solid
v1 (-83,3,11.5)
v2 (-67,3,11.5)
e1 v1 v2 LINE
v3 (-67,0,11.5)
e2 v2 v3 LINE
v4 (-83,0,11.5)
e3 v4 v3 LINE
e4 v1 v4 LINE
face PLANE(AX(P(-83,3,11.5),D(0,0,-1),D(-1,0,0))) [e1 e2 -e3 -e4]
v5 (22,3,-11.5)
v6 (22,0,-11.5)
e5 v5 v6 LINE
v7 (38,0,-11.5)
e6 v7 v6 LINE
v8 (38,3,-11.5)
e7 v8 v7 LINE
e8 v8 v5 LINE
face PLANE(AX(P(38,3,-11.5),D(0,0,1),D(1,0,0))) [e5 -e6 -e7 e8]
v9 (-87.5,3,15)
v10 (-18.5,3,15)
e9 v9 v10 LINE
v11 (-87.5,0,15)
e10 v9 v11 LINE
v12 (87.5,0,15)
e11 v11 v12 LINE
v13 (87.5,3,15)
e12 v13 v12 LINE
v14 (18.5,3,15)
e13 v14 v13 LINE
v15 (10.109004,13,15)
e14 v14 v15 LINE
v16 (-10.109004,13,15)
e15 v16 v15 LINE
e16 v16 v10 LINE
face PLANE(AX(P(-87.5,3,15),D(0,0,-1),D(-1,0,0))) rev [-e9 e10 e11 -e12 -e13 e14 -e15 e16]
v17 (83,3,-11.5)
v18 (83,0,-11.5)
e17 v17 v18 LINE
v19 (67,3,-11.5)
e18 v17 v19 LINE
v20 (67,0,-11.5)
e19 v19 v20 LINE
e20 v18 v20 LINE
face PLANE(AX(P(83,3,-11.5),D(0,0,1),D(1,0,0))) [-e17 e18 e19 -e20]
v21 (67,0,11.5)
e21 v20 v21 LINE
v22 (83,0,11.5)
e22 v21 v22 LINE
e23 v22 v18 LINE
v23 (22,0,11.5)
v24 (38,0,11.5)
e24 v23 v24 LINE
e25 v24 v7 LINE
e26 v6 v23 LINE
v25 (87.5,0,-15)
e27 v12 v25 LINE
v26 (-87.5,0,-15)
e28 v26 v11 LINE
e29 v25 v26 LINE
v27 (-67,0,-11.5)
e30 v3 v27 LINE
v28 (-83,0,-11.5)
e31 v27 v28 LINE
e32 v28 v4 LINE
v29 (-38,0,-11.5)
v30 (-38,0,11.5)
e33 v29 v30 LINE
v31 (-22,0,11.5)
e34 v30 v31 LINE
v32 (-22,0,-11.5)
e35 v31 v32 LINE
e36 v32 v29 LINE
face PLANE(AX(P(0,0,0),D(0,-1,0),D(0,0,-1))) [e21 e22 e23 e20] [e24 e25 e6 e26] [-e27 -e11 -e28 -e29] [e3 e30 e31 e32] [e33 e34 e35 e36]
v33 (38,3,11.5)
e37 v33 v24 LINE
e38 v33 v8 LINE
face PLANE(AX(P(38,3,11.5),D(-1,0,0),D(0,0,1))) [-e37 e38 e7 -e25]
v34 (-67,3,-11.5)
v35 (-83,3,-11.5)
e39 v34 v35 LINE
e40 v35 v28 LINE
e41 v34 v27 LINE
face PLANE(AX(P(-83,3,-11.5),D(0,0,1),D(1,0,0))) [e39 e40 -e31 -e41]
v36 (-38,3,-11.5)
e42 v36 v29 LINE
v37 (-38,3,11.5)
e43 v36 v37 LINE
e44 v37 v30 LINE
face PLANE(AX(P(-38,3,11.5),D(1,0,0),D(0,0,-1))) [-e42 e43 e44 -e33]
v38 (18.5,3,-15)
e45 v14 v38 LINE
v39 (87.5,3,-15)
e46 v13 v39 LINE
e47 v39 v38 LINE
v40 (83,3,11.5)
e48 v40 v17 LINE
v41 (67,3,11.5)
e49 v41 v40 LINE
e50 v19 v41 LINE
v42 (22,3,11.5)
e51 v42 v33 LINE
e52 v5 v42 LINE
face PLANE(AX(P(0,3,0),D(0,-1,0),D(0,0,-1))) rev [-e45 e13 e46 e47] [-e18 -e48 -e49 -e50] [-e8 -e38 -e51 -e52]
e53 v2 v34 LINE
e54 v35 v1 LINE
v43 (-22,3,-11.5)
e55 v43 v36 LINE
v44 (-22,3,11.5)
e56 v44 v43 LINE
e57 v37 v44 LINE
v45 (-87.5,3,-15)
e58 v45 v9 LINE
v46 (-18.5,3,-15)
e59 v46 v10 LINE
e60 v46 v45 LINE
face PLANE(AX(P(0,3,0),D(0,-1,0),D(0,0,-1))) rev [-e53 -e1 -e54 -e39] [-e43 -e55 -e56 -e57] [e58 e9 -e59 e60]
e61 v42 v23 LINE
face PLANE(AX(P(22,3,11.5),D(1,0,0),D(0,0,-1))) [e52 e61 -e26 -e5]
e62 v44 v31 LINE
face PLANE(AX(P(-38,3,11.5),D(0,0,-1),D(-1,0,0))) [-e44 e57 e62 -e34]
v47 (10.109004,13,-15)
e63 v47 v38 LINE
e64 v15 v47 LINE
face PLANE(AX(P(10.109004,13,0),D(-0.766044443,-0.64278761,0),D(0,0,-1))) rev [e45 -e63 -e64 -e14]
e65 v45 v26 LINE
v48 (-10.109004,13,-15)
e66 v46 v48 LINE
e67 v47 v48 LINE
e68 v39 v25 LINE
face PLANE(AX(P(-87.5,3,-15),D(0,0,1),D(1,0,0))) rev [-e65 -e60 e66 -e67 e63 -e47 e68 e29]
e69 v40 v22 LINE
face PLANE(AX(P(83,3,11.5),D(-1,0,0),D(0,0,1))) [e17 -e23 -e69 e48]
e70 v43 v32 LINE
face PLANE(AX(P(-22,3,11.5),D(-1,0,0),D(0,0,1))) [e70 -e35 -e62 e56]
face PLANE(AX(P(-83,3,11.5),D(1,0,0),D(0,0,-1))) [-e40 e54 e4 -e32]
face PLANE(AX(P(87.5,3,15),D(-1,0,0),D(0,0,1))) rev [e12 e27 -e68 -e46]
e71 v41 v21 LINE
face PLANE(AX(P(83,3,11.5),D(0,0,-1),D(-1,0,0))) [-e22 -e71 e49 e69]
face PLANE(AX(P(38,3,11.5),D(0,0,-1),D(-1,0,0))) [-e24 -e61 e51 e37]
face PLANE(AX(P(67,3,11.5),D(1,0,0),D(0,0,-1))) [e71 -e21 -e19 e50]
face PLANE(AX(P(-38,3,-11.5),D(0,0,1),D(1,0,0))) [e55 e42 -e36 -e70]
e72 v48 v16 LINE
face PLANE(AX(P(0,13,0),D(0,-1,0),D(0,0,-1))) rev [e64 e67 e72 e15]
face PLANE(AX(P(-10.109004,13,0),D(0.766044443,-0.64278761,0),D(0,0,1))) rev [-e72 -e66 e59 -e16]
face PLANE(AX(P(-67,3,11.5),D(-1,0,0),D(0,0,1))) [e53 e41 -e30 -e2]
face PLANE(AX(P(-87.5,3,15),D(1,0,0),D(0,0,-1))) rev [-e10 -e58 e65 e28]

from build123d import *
from OCP.BRepFilletAPI import BRepFilletAPI_MakeChamfer

# Parameters (mm, degrees)
CROQUIS1_W              = 175
CROQUIS1_H              = 30
CROQUIS1_W_2            = 16
CROQUIS1_H_2            = 23
SALIENTE_EXTRUIR1_DEPTH = 3
CROQUIS2_W              = 37
CROQUIS2_H              = 30
SALIENTE_EXTRUIR2_DEPTH = 10
CHAFL_N1_SIZE           = 10
CHAFL_N1_SIZE_2         = 8.390996312


with BuildPart() as part:
    # Croquis1 → Saliente-Extruir1 (new body)
    with BuildSketch(Plane(origin=(0, 0, 0), x_dir=(1, 0, 0), z_dir=(0, 1, 0))):
        Rectangle(CROQUIS1_W, CROQUIS1_H)
        with Locations((-75, 0)):
            Rectangle(CROQUIS1_W_2, CROQUIS1_H_2, mode=Mode.SUBTRACT)
        with Locations((30, 0)):
            Rectangle(CROQUIS1_W_2, CROQUIS1_H_2, mode=Mode.SUBTRACT)
        with Locations((-30, 0)):
            Rectangle(CROQUIS1_W_2, CROQUIS1_H_2, mode=Mode.SUBTRACT)
        with Locations((75, 0)):
            Rectangle(CROQUIS1_W_2, CROQUIS1_H_2, mode=Mode.SUBTRACT)
    extrude(amount=SALIENTE_EXTRUIR1_DEPTH)

    # Croquis2 → Saliente-Extruir2 (add)
    with BuildSketch(Plane(origin=(0, 3, 0), x_dir=(1, 0, 0), z_dir=(0, 1, 0))):
        Rectangle(CROQUIS2_W, CROQUIS2_H)
    extrude(amount=SALIENTE_EXTRUIR2_DEPTH)

    # Chaflán1
    chafl_n1_edges_1 = [part.edges().sort_by_distance(p)[0] for p in [
        (18.5, 13, 0),
    ]]
    chafl_n1_side_1 = [part.faces().sort_by_distance(p)[0] for p in [
        (18.5, 12.832180074, 0),
    ]]
    chafl_n1_edges_2 = [part.edges().sort_by_distance(p)[0] for p in [
        (-18.5, 13, 0),
    ]]
    chafl_n1_side_2 = [part.faces().sort_by_distance(p)[0] for p in [
        (-18.5, 12.832180074, 0),
    ]]
    chafl_n1 = BRepFilletAPI_MakeChamfer(part.part.solid().wrapped)
    for e in chafl_n1_edges_1:
        chafl_n1.Add(CHAFL_N1_SIZE - 0.0001, CHAFL_N1_SIZE_2 - 0.0001, e.wrapped, chafl_n1_side_1[0].wrapped)
    for e in chafl_n1_edges_2:
        chafl_n1.Add(CHAFL_N1_SIZE - 0.0001, CHAFL_N1_SIZE_2 - 0.0001, e.wrapped, chafl_n1_side_2[0].wrapped)
    add(Compound.cast(chafl_n1.Shape()), mode=Mode.REPLACE)  # a hair under: the kernel refuses the full size


solid = part.part
